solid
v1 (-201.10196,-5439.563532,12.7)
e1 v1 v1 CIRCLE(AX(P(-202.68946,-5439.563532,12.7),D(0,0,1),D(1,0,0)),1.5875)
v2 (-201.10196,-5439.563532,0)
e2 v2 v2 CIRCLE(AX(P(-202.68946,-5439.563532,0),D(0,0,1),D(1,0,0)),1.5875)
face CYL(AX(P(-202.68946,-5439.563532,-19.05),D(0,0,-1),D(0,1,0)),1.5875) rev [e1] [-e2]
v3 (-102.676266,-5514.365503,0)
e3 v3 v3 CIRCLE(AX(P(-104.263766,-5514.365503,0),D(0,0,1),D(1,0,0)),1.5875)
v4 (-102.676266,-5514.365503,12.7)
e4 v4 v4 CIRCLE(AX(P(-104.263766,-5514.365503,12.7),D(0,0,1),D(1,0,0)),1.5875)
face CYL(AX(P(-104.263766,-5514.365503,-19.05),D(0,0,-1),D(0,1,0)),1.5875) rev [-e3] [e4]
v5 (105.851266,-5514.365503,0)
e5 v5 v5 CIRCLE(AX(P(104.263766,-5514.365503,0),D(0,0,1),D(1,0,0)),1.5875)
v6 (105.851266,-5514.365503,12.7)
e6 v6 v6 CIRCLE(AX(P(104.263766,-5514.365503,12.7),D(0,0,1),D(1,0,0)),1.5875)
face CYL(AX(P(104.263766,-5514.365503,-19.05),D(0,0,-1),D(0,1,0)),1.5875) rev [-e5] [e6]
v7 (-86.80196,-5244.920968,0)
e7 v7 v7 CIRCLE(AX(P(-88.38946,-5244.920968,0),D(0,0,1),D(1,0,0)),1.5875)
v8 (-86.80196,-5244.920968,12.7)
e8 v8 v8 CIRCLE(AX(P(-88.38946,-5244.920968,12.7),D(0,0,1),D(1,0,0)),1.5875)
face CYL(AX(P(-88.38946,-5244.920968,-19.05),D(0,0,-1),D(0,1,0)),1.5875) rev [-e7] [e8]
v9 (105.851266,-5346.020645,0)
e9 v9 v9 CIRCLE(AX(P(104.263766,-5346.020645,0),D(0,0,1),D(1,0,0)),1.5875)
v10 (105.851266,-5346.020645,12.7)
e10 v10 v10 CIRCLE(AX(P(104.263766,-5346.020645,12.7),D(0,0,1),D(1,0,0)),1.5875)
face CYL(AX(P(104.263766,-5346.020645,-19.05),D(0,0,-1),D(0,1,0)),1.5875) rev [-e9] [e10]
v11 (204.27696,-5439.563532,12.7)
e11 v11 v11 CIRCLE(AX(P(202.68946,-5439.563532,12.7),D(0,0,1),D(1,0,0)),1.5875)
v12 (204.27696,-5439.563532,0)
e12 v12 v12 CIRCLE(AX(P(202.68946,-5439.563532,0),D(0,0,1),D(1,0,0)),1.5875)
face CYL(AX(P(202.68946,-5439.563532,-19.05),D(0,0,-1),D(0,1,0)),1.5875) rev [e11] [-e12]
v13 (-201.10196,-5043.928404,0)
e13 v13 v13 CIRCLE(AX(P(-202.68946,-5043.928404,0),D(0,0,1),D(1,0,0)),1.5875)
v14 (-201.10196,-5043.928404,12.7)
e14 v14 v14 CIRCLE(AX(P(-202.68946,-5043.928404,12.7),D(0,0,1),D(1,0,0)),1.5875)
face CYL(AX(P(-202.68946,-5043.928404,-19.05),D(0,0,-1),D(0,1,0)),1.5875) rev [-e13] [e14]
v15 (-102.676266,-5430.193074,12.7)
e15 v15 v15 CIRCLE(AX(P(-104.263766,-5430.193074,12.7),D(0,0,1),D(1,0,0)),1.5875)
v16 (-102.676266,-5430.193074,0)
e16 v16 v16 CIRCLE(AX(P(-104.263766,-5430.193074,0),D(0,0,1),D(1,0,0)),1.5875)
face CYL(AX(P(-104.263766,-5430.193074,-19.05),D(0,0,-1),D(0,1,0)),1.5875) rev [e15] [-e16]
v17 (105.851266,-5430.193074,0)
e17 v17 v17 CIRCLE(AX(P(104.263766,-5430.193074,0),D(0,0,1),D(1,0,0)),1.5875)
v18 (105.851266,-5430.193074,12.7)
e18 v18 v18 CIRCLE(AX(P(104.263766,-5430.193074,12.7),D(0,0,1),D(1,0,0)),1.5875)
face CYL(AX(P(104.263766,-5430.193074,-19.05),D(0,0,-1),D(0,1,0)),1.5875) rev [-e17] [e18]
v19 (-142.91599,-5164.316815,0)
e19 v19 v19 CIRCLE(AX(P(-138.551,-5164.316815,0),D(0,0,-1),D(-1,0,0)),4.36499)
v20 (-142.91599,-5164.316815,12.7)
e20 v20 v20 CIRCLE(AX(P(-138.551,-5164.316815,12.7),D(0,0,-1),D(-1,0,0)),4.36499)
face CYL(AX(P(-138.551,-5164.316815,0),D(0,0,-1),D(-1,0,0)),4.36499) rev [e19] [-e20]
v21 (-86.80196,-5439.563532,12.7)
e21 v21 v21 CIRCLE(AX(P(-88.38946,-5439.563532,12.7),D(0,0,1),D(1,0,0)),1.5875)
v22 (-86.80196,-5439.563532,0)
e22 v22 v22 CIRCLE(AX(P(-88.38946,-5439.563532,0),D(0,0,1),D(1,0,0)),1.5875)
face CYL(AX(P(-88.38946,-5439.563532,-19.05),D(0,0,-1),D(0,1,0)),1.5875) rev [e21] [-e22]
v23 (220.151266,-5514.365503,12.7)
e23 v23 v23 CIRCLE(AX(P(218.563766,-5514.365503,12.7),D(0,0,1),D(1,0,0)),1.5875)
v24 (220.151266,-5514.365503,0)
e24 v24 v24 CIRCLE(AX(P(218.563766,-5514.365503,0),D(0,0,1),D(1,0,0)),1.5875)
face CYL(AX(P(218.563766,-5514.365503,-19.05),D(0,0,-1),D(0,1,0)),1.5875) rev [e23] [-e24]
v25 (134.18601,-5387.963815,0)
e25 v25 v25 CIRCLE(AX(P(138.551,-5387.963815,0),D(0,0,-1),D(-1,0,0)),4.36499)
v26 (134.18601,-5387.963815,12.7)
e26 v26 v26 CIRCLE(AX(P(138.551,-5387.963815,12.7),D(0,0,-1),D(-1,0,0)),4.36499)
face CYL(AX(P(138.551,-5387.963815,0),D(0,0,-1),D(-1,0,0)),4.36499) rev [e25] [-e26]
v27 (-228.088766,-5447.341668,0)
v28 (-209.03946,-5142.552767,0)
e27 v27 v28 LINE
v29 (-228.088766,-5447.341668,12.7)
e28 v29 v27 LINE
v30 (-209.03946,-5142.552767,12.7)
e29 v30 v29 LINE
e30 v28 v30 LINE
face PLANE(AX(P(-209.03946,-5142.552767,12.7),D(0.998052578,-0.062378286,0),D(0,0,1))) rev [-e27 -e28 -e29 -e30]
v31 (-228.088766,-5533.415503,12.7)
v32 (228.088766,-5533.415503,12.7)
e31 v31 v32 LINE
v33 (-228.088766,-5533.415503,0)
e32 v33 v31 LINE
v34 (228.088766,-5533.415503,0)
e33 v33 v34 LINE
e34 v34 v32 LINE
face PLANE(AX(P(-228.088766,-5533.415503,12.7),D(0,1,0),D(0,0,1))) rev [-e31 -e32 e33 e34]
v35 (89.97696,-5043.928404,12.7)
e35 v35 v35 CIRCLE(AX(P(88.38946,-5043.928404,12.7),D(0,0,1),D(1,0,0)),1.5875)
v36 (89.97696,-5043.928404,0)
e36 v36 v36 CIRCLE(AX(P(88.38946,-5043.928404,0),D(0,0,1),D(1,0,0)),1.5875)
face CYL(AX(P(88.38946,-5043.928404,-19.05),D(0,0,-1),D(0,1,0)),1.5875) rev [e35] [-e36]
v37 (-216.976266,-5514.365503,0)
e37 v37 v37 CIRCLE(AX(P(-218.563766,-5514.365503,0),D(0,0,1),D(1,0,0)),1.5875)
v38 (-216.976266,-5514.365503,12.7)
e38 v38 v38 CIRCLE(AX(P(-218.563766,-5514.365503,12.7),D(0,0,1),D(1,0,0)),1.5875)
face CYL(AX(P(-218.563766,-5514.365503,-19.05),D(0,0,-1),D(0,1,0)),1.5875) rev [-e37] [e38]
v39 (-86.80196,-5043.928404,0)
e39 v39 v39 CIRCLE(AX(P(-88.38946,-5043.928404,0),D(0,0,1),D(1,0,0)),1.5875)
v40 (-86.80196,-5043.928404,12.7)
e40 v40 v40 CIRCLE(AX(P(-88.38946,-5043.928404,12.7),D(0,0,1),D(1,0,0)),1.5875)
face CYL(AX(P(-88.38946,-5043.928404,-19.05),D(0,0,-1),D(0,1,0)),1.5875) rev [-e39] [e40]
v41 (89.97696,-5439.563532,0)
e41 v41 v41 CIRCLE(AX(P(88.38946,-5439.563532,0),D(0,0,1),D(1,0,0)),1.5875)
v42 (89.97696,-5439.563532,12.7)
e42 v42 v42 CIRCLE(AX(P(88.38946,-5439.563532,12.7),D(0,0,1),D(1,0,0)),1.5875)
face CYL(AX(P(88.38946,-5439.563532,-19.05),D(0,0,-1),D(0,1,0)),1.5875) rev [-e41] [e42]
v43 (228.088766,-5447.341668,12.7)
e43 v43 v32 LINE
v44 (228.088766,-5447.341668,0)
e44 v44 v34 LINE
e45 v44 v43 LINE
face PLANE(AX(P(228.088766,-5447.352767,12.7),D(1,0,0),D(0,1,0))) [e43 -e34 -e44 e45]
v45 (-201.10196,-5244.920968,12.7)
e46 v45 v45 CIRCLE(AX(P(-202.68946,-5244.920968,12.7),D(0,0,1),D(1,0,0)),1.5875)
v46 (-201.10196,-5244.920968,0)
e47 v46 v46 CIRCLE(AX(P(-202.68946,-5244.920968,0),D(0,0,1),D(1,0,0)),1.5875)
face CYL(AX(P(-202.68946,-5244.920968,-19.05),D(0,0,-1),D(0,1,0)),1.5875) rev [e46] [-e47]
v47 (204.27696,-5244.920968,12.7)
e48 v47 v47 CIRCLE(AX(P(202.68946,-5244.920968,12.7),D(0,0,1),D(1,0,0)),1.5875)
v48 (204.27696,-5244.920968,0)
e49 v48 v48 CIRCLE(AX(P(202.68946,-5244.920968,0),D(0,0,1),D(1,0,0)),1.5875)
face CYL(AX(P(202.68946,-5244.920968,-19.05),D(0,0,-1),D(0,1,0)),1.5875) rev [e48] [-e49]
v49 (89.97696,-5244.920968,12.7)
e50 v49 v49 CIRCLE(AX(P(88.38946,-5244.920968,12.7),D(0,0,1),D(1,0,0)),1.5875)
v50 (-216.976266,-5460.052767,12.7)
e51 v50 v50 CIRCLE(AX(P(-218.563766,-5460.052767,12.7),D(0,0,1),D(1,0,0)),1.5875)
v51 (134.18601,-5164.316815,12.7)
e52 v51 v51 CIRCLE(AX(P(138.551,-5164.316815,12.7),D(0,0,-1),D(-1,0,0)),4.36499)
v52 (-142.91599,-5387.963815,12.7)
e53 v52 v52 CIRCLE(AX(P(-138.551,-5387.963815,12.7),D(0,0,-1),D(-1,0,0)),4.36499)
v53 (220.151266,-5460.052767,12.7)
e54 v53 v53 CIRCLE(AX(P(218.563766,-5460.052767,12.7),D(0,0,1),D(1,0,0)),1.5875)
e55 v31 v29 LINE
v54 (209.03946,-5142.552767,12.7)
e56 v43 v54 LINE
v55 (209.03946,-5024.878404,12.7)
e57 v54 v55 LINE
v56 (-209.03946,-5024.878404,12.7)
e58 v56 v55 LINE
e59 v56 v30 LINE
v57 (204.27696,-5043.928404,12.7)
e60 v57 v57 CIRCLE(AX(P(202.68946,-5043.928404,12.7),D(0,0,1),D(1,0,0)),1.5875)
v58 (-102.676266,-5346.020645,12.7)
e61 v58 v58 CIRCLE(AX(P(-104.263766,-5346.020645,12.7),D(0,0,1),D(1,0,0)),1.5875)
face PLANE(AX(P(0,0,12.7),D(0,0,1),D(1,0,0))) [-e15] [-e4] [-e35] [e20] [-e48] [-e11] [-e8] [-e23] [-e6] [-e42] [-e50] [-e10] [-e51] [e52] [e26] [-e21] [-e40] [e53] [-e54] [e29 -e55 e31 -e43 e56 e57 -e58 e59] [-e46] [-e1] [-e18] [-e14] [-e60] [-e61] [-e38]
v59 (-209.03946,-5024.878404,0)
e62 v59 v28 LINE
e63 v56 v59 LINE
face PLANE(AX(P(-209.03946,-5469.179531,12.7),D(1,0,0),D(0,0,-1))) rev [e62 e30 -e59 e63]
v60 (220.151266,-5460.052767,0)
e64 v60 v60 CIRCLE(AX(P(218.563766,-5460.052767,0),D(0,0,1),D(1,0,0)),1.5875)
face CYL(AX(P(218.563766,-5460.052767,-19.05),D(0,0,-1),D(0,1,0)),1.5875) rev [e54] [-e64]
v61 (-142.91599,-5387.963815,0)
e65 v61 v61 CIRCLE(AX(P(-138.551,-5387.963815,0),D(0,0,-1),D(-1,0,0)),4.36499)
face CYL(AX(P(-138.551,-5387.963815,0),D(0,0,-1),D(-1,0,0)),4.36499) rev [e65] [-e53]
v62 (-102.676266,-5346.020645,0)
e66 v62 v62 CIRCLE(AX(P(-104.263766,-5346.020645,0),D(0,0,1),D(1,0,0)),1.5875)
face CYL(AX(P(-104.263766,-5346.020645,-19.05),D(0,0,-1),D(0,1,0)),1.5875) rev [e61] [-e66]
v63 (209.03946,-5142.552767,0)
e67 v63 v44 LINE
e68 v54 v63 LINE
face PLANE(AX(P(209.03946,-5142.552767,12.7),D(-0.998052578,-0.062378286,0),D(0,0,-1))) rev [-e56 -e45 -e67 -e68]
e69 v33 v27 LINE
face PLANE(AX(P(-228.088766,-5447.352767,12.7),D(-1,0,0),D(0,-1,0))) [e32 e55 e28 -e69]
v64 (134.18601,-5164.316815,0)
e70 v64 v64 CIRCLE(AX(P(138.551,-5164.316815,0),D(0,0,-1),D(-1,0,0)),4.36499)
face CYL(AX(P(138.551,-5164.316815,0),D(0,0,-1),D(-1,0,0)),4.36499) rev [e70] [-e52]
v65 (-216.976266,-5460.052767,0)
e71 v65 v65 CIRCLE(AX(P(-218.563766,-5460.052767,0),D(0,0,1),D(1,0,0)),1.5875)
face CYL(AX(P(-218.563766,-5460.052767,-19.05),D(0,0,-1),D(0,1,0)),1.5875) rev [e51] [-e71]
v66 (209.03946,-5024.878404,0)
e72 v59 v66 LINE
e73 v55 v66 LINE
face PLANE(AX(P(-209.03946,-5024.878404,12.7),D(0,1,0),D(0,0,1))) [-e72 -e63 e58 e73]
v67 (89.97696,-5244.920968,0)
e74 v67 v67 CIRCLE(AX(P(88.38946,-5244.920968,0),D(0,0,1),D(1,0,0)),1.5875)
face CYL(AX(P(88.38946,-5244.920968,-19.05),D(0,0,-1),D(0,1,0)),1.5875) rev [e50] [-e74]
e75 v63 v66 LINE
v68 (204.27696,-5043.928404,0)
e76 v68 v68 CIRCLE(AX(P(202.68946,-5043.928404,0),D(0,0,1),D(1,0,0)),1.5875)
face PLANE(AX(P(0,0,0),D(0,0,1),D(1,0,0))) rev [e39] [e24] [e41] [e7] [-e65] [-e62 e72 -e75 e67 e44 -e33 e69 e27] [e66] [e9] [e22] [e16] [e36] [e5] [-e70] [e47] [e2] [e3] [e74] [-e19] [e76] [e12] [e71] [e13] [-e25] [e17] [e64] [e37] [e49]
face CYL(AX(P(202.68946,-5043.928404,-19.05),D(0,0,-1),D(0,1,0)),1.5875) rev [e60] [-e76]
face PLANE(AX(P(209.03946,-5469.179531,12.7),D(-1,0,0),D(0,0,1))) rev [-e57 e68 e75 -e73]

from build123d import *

# Parameters (mm, degrees)
SKETCH1_W                = 418.07892
SKETCH1_H                = 415.925
BOSS_EXTRUDE1_DEPTH      = 12.7
SKETCH2_W                = 418.07892
SKETCH2_H                = 79.68996
BOSS_EXTRUDE2_DEPTH      = 12.7
SKETCH3_W                = 418.07892
SKETCH3_H                = 28.376126504
BOSS_EXTRUDE3_DEPTH      = 12.7
BOSS_EXTRUDE4_DEPTH      = 12.7
CHAMFER1_SIZE            = 304.8
CHAMFER1_SIZE_2          = 19.05
SKETCH5_W                = 12.7
SKETCH5_H                = 15.453987587
CUT_EXTRUDE1_DEPTH       = 5568.603780331
F_5_16_CLEARANCE_HOLE1_D = 8.72998
HOLE1_D                  = 3.175
HOLE1_DEPTH              = 50.8
HOLE1_CSINK_D            = 10.16
HOLE1_CSINK_ANGLE        = 82
HOLE1_TIP                = 0.953866233


with BuildPart() as part:
    # Sketch1 → Boss-Extrude1 (new body)
    with BuildSketch(Plane.XY):
        with Locations((0, -5261.217030575)):
            Rectangle(SKETCH1_W, SKETCH1_H)
    extrude(amount=BOSS_EXTRUDE1_DEPTH)

    # Sketch2 → Boss-Extrude2 (add, through all)
    with BuildSketch(Plane(origin=(0, 0, 0), x_dir=(-1, 0, 0), z_dir=(0, 0, -1))):
        with Locations((0, -5509.024510575)):
            Rectangle(SKETCH2_W, SKETCH2_H)
    extrude(amount=-BOSS_EXTRUDE2_DEPTH)

    # Sketch3 → Boss-Extrude3 (add, through all)
    with BuildSketch(Plane(origin=(0, 0, 0), x_dir=(-1, 0, 0), z_dir=(0, 0, -1))):
        with Locations((0, -5039.066467323)):
            Rectangle(SKETCH3_W, SKETCH3_H)
    extrude(amount=-BOSS_EXTRUDE3_DEPTH)

    # Sketch4 → Boss-Extrude4 (add, through all)
    with BuildSketch(Plane(origin=(0, 0, 0), x_dir=(-1, 0, 0), z_dir=(0, 0, -1))):
        Polygon((209.038766336, -5447.352766987), (228.088766336, -5447.352766987), (228.088766336, -5548.869490575), (209.03946, -5548.869490575), align=None)
        Polygon((-209.03946, -5548.869490575), (-209.038766336, -5447.352766987), (-228.088766336, -5447.352766987), (-228.088766336, -5548.869490575), align=None)
    extrude(amount=-BOSS_EXTRUDE4_DEPTH)

    # Chamfer1
    # the kernel refuses this chamfer: 304.8, 19.05 mm, written as the material it adds along each edge
    with BuildSketch(Plane(origin=(-209.03946, -5447.352766987, 0), x_dir=(0.002399337658707147, 0.9999971215852571, 0), z_dir=(0, 0, 1))) as chamfer1_piece_1_section:
        Polygon((CHAMFER1_SIZE * 0.999997121585, CHAMFER1_SIZE * 0.00239933765871), (-CHAMFER1_SIZE_2 * 0.00239933765871, CHAMFER1_SIZE_2 * 0.999997121585), (0, 0), align=None)
    chamfer1_piece_1 = extrude(amount=12.7, mode=Mode.PRIVATE)
    chamfer1_piece_1 = split(chamfer1_piece_1, bisect_by=Plane(origin=(-228.088766336, -5325.682018196, 6.35), z_dir=(1, 0, 0)), keep=Keep.TOP, mode=Mode.PRIVATE)
    add(chamfer1_piece_1)
    with BuildSketch(Plane(origin=(209.03946, -5447.352766987, 0), x_dir=(0.8520963193143735, -0.5233850041899339, 0), z_dir=(0, 0, 1))) as chamfer1_piece_2_section:
        Polygon((CHAMFER1_SIZE_2 * 0.852096319314, CHAMFER1_SIZE_2 * 0.52338500419), (-CHAMFER1_SIZE * 0.52338500419, CHAMFER1_SIZE * 0.852096319314), (0, 0), align=None)
    chamfer1_piece_2 = extrude(amount=12.7, mode=Mode.PRIVATE)
    chamfer1_piece_2 = split(chamfer1_piece_2, bisect_by=Plane(origin=(228.088766336, -5325.682018196, 6.35), z_dir=(-1, 0, 0)), keep=Keep.TOP, mode=Mode.PRIVATE)
    add(chamfer1_piece_2)

    # Sketch5 → Cut-Extrude1 (cut, through all)
    with BuildSketch(Plane(origin=(228.088766336, 0, 0), x_dir=(0, 0, -1), z_dir=(1, 0, 0))):
        with Locations((-6.35, -5541.142496782)):
            Rectangle(SKETCH5_W, SKETCH5_H)
    extrude(amount=-CUT_EXTRUDE1_DEPTH, mode=Mode.SUBTRACT)

    # 5/16 Clearance Hole1 (through all)
    with Locations(Plane(origin=(0, 0, 0), x_dir=(-1, 0, 0), z_dir=(0, 0, -1))):
        with Locations((138.550999994, -5387.96381451), (-138.550999994, -5387.96381451), (-138.550999994, -5164.31681451), (138.550999994, -5164.31681451)):
            Hole(F_5_16_CLEARANCE_HOLE1_D / 2)

    # Hole1
    with Locations(Plane(origin=(0, -5562.870276207, -19.05), x_dir=(-1, 0, 0), z_dir=(0, 0, -1))):
        with Locations((218.563766336, 102.817509219), (218.563766336, 48.504773219), (202.68946, 123.306744588), (202.68946, 317.949308361), (202.68946, 518.941872135), (88.38946, 518.941872135), (88.38946, 317.949308361), (88.38946, 123.306744588), (104.263766336, 216.849631358), (104.263766336, 132.677202288), (104.263766336, 48.504773219), (-104.263766336, 48.504773219), (-104.263766336, 132.677202288), (-104.263766336, 216.849631358), (-88.38946, 123.306744588), (-88.38946, 317.949308361), (-88.38946, 518.941872135), (-202.68946, 518.941872135), (-202.68946, 317.949308361), (-202.68946, 123.306744588), (-218.563766336, 48.504773219), (-218.563766336, 102.817509219)):
            CounterSinkHole(HOLE1_D / 2, HOLE1_CSINK_D / 2, depth=HOLE1_DEPTH, counter_sink_angle=HOLE1_CSINK_ANGLE)
            with Locations((0, 0, -(HOLE1_DEPTH + HOLE1_TIP / 2))):  # 118° drill point
                Cone(0, HOLE1_D / 2, HOLE1_TIP, mode=Mode.SUBTRACT)


solid = part.part
